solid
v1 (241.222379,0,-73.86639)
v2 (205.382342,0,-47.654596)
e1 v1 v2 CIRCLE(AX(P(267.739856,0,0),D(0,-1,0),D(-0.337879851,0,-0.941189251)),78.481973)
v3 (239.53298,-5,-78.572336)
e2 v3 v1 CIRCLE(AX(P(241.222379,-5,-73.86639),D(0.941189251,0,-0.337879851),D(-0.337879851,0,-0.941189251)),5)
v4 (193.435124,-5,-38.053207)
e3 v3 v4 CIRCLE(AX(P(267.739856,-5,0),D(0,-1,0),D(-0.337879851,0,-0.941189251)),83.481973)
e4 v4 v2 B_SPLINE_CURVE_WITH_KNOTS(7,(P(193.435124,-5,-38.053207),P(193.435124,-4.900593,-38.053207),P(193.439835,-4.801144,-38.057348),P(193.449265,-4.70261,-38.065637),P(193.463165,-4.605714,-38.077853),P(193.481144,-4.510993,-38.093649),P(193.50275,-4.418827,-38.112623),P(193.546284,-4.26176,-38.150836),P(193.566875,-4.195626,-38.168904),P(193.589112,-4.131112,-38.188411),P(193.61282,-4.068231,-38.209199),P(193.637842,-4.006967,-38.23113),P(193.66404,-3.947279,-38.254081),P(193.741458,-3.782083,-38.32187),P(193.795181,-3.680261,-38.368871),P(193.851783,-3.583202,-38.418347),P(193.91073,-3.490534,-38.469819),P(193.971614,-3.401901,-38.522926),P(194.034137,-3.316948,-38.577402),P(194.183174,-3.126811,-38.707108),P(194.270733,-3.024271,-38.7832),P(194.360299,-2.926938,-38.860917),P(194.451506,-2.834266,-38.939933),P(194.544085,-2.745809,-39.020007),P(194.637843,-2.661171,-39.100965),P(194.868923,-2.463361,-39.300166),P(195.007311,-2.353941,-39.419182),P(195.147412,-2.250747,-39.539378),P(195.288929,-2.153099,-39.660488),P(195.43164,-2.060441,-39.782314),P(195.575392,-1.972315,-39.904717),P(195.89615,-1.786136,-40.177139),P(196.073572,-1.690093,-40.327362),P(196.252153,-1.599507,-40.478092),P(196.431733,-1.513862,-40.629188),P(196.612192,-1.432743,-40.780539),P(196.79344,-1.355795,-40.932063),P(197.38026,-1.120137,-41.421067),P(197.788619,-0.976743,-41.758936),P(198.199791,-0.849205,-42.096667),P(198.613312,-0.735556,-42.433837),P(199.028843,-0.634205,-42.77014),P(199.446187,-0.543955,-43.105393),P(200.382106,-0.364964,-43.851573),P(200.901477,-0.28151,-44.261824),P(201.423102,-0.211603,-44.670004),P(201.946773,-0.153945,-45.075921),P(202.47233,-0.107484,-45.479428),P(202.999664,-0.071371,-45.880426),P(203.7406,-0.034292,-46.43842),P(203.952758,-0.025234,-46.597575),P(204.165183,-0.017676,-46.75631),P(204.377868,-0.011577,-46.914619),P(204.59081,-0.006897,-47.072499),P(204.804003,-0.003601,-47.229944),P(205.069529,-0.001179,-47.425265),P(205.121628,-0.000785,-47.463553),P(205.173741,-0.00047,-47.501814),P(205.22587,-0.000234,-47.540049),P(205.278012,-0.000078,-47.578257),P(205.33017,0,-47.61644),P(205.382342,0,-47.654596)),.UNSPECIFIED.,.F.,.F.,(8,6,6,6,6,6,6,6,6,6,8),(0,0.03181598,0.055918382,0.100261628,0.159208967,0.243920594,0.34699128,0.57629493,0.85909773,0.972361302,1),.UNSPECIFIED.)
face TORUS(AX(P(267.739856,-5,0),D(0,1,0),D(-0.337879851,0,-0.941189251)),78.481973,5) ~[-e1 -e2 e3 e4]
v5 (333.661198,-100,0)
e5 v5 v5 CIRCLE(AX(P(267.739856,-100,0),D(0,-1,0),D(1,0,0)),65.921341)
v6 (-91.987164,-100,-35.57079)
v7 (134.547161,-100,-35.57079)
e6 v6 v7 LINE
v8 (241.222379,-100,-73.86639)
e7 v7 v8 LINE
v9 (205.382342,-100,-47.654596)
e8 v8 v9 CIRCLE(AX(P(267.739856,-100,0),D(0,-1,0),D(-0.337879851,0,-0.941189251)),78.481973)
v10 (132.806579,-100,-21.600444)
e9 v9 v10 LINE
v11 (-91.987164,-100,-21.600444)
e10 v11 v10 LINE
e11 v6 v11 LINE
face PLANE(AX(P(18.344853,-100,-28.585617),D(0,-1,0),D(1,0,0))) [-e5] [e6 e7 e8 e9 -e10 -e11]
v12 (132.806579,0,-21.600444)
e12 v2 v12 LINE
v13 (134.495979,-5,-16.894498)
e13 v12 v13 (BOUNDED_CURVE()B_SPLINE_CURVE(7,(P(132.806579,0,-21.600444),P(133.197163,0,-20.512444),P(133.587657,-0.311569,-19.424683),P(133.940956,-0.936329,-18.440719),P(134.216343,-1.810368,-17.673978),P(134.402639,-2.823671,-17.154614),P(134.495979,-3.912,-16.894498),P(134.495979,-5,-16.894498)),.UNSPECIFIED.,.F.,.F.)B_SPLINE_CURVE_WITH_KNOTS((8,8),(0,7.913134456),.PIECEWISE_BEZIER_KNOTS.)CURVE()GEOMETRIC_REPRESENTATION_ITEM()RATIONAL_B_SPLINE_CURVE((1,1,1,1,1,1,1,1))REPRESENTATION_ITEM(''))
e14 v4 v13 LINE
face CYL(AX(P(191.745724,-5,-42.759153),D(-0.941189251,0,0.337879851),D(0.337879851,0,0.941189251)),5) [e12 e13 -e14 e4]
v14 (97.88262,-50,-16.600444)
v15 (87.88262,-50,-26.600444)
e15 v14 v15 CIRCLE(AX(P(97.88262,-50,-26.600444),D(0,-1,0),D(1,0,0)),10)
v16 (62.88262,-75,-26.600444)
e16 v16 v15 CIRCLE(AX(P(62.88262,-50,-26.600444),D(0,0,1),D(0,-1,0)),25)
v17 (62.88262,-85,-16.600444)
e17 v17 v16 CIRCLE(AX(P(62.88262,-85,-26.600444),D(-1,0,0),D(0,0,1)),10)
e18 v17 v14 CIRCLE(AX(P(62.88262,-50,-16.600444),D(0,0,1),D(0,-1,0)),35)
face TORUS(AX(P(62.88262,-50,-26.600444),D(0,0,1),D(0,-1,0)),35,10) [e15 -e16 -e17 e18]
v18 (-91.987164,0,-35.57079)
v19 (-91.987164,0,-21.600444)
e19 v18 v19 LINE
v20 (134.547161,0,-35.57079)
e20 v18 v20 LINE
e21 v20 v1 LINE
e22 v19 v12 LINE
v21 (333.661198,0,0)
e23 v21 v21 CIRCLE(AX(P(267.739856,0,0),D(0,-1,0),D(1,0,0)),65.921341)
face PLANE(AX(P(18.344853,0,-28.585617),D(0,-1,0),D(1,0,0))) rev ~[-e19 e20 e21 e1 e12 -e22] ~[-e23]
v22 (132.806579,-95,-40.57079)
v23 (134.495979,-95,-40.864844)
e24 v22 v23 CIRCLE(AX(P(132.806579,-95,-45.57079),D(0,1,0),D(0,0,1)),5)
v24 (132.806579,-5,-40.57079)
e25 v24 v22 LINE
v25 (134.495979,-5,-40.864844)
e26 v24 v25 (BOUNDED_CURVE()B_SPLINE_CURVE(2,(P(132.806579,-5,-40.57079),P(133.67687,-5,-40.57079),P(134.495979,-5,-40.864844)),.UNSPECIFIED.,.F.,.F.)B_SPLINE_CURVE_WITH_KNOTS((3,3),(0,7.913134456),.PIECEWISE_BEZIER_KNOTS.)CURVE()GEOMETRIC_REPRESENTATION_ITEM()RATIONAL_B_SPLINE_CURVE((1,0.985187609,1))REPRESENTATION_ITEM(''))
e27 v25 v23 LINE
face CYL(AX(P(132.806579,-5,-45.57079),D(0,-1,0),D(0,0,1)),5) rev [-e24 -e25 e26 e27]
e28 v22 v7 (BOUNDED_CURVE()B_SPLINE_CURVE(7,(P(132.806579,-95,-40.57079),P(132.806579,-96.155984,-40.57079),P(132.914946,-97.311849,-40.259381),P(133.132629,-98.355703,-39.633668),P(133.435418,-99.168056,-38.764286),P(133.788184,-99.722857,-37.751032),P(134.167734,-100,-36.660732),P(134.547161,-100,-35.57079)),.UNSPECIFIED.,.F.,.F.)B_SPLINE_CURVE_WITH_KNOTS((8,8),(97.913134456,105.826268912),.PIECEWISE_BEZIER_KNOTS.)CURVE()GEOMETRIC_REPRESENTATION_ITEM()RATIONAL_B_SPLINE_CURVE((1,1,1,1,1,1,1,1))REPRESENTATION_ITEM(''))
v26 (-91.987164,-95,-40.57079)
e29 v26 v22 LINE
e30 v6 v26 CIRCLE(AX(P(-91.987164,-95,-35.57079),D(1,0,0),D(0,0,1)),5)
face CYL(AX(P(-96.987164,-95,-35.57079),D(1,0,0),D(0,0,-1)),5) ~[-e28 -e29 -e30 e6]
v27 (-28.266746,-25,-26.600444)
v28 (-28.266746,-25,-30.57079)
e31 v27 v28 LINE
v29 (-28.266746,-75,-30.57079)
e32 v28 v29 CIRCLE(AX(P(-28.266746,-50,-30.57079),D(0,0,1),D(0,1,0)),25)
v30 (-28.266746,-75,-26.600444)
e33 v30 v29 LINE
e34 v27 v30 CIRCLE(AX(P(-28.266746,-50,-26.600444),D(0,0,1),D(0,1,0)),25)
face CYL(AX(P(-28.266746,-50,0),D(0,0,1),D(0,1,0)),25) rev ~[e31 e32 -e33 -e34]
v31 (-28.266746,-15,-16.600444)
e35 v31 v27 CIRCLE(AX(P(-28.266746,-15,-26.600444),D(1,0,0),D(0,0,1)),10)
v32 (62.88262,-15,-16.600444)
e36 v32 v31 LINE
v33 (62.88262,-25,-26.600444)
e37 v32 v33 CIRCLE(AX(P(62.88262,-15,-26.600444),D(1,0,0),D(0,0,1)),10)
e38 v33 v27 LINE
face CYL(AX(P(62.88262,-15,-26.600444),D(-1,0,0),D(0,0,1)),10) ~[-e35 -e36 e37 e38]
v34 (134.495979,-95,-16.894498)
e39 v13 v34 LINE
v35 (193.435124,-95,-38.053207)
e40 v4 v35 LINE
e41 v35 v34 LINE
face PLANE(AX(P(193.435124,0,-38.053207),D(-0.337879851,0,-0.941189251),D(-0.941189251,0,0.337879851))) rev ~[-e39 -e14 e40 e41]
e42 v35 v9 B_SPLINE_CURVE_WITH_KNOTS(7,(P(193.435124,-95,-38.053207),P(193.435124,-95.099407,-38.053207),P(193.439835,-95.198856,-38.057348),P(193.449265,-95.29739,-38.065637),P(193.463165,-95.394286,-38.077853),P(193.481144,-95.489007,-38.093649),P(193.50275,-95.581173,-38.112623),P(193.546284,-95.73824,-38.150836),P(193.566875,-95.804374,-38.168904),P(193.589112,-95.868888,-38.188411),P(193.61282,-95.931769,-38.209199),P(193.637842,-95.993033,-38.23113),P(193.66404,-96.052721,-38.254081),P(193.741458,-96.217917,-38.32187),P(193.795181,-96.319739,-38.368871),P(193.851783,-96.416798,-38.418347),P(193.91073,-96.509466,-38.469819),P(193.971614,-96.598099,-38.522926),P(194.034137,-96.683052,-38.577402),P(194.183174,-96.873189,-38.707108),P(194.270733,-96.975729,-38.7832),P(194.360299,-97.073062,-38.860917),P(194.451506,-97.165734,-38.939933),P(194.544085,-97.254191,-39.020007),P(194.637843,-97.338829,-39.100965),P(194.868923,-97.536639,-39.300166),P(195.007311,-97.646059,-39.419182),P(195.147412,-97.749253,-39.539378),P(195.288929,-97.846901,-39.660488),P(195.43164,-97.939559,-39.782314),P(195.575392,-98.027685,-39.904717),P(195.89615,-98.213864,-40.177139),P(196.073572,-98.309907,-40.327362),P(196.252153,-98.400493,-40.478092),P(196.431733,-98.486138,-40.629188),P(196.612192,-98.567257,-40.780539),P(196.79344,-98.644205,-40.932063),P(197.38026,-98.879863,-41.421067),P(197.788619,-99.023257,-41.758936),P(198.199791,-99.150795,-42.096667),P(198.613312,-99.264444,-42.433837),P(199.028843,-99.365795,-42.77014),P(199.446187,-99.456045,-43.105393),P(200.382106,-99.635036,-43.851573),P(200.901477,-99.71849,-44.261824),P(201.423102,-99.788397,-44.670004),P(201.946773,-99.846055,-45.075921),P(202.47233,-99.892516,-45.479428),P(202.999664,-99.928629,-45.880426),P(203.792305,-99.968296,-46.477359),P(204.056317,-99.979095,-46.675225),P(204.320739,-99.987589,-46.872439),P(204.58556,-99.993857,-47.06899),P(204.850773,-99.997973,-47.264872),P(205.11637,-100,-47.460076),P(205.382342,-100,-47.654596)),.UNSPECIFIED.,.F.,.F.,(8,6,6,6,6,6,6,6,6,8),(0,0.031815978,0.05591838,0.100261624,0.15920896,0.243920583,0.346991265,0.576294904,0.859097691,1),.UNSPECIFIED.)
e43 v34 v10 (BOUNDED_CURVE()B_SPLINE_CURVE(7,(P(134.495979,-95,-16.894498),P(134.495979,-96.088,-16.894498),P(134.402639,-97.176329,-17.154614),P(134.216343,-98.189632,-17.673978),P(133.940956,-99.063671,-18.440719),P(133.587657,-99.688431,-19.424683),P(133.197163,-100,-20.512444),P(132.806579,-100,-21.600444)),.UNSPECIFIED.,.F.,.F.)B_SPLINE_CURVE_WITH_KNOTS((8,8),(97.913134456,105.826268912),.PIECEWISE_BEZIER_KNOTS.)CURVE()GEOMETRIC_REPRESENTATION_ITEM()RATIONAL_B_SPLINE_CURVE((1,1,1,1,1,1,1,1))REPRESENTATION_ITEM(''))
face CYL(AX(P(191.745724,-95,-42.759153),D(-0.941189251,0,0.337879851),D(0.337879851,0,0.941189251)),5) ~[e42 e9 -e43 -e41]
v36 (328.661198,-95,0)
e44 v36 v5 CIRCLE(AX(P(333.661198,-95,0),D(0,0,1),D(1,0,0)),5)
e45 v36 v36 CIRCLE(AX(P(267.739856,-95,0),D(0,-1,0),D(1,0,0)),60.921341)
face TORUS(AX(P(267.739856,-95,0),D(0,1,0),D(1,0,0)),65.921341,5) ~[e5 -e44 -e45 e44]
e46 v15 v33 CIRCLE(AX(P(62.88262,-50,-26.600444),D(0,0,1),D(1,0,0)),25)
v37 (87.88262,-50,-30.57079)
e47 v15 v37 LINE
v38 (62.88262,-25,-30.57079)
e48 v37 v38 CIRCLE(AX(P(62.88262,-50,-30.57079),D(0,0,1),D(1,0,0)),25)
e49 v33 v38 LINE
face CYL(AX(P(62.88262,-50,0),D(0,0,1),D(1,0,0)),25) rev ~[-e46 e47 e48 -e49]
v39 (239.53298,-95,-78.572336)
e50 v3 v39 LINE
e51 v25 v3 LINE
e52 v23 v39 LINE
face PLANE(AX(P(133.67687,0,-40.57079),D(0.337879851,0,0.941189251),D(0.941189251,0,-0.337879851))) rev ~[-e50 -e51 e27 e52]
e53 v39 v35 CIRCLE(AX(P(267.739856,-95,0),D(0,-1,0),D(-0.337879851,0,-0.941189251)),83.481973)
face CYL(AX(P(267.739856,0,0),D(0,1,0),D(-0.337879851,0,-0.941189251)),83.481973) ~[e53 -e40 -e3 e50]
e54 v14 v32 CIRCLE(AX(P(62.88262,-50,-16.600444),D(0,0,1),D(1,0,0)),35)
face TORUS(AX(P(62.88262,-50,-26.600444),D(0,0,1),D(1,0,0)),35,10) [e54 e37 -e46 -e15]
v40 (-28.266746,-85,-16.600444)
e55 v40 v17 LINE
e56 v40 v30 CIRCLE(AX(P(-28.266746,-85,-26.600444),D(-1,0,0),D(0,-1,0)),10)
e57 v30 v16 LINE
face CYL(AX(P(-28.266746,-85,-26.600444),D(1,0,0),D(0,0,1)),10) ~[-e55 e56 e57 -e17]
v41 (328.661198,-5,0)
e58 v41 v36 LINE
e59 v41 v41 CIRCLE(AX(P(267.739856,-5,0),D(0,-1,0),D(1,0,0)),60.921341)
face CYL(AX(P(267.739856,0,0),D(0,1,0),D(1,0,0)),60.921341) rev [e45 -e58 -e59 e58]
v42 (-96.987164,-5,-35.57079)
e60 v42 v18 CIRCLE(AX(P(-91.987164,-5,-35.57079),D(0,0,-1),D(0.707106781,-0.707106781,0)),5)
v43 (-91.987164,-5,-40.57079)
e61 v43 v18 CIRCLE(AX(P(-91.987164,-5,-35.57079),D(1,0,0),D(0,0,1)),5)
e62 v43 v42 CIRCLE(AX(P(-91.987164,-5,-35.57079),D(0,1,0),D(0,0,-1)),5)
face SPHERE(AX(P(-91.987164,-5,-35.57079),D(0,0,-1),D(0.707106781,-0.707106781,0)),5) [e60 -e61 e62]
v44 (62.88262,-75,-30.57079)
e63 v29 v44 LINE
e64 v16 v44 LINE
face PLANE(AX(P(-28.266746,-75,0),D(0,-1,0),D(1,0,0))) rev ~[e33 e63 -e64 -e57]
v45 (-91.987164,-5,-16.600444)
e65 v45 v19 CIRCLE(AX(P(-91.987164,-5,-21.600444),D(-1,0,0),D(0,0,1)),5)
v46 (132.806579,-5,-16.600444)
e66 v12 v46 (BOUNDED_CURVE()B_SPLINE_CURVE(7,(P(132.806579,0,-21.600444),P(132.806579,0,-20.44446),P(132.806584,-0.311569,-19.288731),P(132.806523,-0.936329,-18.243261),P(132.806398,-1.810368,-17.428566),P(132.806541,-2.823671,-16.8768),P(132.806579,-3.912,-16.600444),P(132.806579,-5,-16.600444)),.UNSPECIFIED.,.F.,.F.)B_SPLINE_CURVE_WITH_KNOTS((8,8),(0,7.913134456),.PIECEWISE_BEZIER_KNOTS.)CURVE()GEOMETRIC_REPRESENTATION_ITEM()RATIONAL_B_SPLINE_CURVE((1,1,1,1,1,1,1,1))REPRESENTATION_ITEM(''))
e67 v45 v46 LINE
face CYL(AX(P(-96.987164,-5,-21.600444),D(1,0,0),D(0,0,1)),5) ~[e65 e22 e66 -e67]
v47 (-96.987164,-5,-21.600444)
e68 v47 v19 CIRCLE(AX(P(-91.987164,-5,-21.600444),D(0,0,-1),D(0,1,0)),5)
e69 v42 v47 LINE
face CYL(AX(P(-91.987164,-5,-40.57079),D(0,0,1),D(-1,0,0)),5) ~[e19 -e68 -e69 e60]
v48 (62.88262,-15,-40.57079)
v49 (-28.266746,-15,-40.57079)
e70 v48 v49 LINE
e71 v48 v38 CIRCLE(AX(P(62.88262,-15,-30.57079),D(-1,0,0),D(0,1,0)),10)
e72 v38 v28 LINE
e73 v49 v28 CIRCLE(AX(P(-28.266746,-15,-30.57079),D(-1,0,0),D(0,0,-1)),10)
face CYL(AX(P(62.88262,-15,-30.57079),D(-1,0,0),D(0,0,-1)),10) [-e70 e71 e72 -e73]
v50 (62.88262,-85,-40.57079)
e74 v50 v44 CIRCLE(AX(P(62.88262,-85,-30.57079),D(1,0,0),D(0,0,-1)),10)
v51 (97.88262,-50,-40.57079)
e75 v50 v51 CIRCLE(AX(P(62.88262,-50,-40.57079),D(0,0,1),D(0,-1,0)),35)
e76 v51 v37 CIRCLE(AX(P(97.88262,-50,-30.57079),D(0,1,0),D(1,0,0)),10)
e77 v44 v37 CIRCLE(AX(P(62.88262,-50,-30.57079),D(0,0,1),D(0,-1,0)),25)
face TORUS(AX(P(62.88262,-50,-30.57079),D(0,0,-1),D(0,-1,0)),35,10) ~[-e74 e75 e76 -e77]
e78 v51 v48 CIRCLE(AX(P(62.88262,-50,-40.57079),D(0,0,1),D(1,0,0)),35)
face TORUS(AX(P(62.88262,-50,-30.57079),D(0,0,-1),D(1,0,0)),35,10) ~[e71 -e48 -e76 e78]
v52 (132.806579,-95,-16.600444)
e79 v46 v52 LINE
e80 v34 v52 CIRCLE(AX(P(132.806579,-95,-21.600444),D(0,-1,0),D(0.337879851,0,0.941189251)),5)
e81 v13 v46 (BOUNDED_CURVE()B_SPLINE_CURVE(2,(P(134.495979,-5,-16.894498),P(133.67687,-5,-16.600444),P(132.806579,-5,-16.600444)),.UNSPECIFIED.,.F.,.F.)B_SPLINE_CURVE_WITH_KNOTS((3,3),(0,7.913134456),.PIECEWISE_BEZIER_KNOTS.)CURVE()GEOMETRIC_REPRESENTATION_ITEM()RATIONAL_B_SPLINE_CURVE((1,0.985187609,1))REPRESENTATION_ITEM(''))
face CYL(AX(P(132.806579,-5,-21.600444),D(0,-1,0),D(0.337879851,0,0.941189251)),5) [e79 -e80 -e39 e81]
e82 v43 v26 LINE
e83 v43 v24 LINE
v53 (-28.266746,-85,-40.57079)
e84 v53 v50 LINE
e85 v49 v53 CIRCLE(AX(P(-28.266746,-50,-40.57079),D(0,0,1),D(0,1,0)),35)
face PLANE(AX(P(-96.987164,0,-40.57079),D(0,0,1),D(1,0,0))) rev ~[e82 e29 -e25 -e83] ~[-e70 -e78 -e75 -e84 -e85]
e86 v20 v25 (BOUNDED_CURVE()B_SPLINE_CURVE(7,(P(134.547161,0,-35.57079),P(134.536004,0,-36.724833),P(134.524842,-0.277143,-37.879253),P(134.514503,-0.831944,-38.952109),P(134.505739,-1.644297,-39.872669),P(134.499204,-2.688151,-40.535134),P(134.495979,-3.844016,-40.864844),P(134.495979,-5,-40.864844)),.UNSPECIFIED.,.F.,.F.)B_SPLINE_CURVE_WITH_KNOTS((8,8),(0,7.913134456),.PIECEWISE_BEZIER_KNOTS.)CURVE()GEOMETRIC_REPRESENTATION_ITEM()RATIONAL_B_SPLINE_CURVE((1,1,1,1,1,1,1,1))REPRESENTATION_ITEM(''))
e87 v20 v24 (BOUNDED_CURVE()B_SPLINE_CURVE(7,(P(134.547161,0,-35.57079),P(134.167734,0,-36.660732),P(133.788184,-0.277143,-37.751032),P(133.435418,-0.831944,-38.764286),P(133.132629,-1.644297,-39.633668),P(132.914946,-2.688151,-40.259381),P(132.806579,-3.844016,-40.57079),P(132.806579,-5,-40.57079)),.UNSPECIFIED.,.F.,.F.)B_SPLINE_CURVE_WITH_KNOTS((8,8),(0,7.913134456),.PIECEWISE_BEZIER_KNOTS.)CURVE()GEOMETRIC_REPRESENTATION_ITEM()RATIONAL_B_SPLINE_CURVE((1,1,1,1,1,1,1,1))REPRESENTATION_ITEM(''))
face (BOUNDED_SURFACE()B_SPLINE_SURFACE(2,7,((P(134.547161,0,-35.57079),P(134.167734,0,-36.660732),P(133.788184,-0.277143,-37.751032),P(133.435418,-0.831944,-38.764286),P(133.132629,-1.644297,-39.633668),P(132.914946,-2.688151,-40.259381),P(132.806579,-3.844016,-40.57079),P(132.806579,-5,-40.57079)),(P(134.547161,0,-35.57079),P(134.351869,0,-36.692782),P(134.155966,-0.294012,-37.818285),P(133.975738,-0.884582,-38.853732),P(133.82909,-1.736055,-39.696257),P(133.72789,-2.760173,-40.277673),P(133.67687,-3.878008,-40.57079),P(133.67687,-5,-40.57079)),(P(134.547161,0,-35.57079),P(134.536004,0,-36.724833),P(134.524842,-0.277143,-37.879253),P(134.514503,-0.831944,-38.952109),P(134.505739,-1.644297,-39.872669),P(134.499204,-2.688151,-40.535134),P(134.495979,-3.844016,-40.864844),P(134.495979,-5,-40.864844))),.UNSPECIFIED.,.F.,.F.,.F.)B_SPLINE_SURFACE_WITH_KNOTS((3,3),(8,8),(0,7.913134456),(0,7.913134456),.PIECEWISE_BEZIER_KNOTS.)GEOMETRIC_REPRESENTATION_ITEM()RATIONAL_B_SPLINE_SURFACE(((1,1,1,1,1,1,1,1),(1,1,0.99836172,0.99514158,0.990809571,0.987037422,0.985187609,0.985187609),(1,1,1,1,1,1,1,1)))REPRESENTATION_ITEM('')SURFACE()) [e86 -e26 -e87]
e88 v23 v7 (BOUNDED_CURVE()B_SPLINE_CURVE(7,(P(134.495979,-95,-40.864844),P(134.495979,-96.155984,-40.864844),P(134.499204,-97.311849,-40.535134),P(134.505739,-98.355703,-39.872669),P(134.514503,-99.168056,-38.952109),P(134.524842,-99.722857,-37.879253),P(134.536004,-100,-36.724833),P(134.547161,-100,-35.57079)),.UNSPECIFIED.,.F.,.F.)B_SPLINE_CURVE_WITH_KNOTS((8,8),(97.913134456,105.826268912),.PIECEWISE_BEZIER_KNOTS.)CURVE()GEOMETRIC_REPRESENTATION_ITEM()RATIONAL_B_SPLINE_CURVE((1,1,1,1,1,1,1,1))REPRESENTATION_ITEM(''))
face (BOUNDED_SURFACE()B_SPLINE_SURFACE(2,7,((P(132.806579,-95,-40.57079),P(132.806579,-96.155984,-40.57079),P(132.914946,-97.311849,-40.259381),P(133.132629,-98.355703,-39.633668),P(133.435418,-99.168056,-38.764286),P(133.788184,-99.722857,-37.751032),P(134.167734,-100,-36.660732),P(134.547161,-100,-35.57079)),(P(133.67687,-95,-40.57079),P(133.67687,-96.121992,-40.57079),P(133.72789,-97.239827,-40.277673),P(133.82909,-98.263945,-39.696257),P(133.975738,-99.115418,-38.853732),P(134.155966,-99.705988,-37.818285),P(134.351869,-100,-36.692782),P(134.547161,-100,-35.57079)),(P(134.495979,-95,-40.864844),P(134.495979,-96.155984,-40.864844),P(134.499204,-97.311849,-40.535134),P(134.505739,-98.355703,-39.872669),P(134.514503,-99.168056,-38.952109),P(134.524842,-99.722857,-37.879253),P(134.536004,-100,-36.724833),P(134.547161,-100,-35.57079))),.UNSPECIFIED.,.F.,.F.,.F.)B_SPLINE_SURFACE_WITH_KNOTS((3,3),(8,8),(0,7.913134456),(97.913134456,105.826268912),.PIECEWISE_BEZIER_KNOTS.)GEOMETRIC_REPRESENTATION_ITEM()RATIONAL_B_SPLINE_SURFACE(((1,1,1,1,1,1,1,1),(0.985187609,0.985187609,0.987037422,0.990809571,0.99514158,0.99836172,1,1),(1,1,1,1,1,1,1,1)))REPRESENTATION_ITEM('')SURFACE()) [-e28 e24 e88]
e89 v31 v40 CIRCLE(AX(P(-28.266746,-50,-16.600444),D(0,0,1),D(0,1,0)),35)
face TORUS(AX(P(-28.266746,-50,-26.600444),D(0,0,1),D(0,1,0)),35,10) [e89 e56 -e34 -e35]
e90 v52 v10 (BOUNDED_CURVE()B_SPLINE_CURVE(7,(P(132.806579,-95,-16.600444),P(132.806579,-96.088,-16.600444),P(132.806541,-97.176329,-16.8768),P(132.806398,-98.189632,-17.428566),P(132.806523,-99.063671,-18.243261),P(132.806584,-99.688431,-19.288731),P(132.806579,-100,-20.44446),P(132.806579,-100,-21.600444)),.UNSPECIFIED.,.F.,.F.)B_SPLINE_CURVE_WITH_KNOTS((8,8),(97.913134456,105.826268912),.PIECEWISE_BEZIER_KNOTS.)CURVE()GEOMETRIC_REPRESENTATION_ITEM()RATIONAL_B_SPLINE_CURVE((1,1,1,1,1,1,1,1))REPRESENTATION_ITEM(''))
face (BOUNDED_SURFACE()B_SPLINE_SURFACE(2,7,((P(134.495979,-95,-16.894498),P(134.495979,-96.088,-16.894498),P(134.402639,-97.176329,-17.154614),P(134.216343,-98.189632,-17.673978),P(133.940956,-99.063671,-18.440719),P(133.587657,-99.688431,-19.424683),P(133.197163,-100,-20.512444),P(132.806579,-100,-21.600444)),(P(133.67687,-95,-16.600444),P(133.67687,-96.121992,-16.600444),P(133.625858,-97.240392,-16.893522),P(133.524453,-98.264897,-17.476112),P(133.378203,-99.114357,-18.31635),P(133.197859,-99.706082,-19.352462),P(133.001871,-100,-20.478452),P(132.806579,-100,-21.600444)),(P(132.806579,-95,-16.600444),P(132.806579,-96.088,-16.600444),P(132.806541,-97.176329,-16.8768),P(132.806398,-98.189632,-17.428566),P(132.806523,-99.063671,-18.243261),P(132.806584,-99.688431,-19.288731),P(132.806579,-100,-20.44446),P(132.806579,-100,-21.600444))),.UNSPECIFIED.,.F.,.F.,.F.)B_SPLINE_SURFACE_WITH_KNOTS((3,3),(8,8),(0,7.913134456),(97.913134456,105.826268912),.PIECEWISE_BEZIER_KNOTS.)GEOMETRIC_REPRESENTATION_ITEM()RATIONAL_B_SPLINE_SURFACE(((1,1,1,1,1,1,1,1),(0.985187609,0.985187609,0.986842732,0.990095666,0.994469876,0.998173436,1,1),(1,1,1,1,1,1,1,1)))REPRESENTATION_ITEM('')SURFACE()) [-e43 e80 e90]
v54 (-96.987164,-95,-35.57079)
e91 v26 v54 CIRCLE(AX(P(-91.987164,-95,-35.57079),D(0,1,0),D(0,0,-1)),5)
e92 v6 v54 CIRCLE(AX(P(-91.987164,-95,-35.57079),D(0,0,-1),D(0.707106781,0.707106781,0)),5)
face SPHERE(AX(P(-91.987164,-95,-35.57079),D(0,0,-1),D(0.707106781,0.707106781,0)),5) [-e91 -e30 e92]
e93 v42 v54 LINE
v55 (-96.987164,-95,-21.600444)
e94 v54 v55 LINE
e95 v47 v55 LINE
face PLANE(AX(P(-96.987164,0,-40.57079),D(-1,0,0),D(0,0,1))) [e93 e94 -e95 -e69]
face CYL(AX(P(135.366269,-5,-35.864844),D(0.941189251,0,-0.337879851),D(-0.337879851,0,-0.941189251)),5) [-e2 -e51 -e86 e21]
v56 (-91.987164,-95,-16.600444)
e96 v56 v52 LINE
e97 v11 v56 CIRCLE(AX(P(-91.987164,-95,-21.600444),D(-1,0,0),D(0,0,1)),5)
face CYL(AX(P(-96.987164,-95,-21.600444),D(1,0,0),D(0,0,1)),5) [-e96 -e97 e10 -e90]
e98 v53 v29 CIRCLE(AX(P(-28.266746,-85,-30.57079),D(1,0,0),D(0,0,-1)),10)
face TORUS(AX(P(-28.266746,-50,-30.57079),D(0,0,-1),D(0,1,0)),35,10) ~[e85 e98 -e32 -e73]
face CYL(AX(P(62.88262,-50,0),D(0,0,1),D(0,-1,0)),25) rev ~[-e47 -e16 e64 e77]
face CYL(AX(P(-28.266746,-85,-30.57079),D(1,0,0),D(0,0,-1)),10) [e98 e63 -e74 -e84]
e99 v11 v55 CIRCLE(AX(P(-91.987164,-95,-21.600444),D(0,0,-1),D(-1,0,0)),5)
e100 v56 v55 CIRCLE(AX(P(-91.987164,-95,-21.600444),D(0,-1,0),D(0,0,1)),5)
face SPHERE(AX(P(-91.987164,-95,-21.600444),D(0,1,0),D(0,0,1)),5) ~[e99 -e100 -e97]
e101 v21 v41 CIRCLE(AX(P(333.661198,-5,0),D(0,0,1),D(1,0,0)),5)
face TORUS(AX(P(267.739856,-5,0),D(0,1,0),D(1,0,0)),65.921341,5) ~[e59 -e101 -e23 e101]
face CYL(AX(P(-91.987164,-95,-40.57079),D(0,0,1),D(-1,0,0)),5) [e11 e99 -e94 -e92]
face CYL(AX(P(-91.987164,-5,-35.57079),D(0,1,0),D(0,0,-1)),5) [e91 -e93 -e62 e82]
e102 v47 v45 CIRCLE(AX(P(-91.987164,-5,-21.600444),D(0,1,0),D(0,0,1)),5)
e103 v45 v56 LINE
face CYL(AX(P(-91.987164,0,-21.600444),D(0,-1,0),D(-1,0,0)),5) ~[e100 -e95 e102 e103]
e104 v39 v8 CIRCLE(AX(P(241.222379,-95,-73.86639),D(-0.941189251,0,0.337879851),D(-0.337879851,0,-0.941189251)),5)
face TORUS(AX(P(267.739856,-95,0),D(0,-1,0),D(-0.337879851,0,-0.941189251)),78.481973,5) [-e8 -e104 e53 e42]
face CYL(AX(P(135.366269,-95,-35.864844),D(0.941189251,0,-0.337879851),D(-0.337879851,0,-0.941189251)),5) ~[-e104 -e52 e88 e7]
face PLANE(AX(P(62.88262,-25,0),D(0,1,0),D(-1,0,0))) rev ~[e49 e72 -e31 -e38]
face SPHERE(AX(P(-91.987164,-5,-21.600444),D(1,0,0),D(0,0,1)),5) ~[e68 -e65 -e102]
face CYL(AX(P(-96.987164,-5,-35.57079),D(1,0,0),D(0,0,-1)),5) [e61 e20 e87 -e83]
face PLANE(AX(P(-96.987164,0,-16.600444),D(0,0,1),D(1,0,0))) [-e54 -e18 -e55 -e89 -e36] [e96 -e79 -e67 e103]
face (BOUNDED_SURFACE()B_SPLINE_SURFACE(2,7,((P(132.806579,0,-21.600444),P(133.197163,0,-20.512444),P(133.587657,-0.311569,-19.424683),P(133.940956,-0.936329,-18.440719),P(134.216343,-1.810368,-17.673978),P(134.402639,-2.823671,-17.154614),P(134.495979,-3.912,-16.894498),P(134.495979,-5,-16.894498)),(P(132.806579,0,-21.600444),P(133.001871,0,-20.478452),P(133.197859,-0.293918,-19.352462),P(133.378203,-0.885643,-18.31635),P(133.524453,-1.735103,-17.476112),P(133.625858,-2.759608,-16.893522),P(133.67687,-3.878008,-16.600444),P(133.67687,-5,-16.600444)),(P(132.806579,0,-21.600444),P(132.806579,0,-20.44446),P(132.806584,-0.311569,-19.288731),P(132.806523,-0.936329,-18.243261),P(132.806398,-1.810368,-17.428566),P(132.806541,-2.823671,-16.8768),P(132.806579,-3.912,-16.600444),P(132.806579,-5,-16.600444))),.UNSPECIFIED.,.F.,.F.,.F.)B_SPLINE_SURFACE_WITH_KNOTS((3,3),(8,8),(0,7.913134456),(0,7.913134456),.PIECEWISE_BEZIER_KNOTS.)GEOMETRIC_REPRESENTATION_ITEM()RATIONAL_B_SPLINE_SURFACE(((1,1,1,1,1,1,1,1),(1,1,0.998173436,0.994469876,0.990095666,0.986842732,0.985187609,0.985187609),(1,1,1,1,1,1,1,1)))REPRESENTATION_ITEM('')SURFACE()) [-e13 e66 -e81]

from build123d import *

# Parameters (mm, degrees)
F0_W         = 230.6640344313
F0_H         = 23.9703460229
F0_R         = 60.9213413602
F1_DEPTH     = 100
F2_R         = 5
F3_R         = 5
F5_DEPTH     = 126.802245155
F6_R         = 10
F7_T1_DEPTH  = 90
F7_S5_W      = 5
F7_S5_H      = 5
F7_T6_DEPTH  = 5
F7_S11_W     = 5
F7_S11_H     = 5
F7_T12_DEPTH = 5
F8_R         = 5


# Not quite as in the source:
# - a fillet or chamfer that OpenCascade refuses, or shapes differently, is made with other operations: its cross-section is extruded or revolved along the edge and cut away or added


with BuildPart() as f1:
    # F0 (on Front) → F1 (new body)
    with BuildSketch(Plane.XZ):
        with Locations((18.3448529433, -28.5856171006)):
            Rectangle(F0_W, F0_H)
        with BuildLine():
            Line((193.4351235014, -38.0532068809), (133.676870159, -16.6004440891))
            Line((133.676870159, -16.6004440891), (133.676870159, -40.570790112))
            Line((133.676870159, -40.570790112), (239.5329796232, -78.572335997))
            ThreePointArc((239.5329796232, -78.572335997), (322.8543506597, 62.7027303843), (193.4351235014, -38.0532068809))
        make_face()
        with Locations((267.7398563617, 0)):
            Circle(F0_R, mode=Mode.SUBTRACT)
    extrude(amount=F1_DEPTH)

    # F2
    f2_edges = [f1.edges().sort_by_distance(p)[0] for p in [
        (186.604925, 0, -59.571563),
        (18.344853, 0, -40.57079),
        (18.344853, 0, -16.600444),
        (163.555997, 0, -27.326825),
        (-96.987164, -50, -16.600444),
        (-96.987164, 0, -28.585617),
        (206.818515, -100, 0),
        (322.854351, -100, 62.70273),
        (18.344853, -100, -16.600444),
        (-96.987164, -100, -28.585617),
        (18.344853, -100, -40.57079),
        (186.604925, -100, -59.571563),
        (163.555997, -100, -27.326825),
    ]]
    fillet(f2_edges, radius=F2_R)

    # F3
    f3_edges = [f1.edges().sort_by_distance(p)[0] for p in [
        (206.818515, 0, 0),
    ]]
    fillet(f3_edges, radius=F3_R)

    # F4 (on Top) → F5 (cut)
    with BuildSketch(Plane.XY):
        with BuildLine():
            ThreePointArc((-28.2667462326, -75), (-10.5890767029, -67.6776695297), (-3.2667462326, -50))
            ThreePointArc((-3.2667462326, -50), (-10.5890767029, -32.3223304703), (-28.2667462326, -25))
            ThreePointArc((-28.2667462326, -25), (-53.2667462326, -50), (-28.2667462326, -75))
        make_face()
        with BuildLine():
            ThreePointArc((-28.2667462326, -25), (-10.5890767029, -32.3223304703), (-3.2667462326, -50))
            ThreePointArc((-3.2667462326, -50), (-10.5890767029, -67.6776695297), (-28.2667462326, -75))
            Line((-28.2667462326, -75), (62.8826200036, -75))
            ThreePointArc((62.8826200036, -75), (37.8826200036, -50), (62.8826200036, -25))
            Line((62.8826200036, -25), (-28.2667462326, -25))
        make_face()
        with BuildLine():
            ThreePointArc((87.8826200036, -50), (80.5602895333, -32.3223304703), (62.8826200036, -25))
            ThreePointArc((62.8826200036, -25), (37.8826200036, -50), (62.8826200036, -75))
            ThreePointArc((62.8826200036, -75), (80.5602895333, -67.6776695297), (87.8826200036, -50))
        make_face()
    extrude(amount=-F5_DEPTH, mode=Mode.SUBTRACT)

    # F6
    f6_edges = [f1.edges().sort_by_distance(p)[0] for p in [
        (17.307937, -75, -40.57079),
        (17.307937, -25, -16.600444),
    ]]
    fillet(f6_edges, radius=F6_R)

    # F7: fillet of radius 5 on 1 edges, made by hand

    # F7_s2 → F7_t1 (cut)
    with BuildSketch(Plane.XZ.offset(5)):
        with BuildLine():
            ThreePointArc((-91.9871642723, -40.570790112), (-95.5226981783, -39.106324018), (-96.9871642723, -35.570790112))
            Line((-96.9871642723, -35.570790112), (-96.9871642723, -40.570790112))
            Line((-96.9871642723, -40.570790112), (-91.9871642723, -40.570790112))
        make_face()
    extrude(amount=F7_T1_DEPTH, mode=Mode.SUBTRACT)


with BuildPart() as f7_tool4:
    # F7_s5 → F7_t6 (new body)
    with BuildSketch(Plane.XY.offset(-35.570790112)):
        with Locations((-94.4871642723, -2.5)):
            Rectangle(F7_S5_W, F7_S5_H)
    extrude(amount=-F7_T6_DEPTH)

    # F7_s7 → F7_t8 (revolve, cut)
    with BuildSketch(Plane(origin=(-91.9871642723, -5, -35.570790112), x_dir=(0.7071067812, -0.7071067812, 0), z_dir=(0.7071067812, 0.7071067812, 0))):
        with BuildLine():
            ThreePointArc((0, -5), (5, 0), (0, 5))
            Line((0, 5), (0, -5))
        make_face()
    revolve(axis=Axis((-91.9871642723, -5, -35.570790112), (0, 0, -1)), mode=Mode.SUBTRACT)


with BuildPart() as f1_1:
    add(f1.part)

    # F7_t3: cut F7_tool4
    add(f7_tool4.part, mode=Mode.SUBTRACT)


with BuildPart() as f7_tool10:
    # F7_s11 → F7_t12 (new body)
    with BuildSketch(Plane.XY.offset(-35.570790112)):
        with Locations((-94.4871642723, -97.5)):
            Rectangle(F7_S11_W, F7_S11_H)
    extrude(amount=-F7_T12_DEPTH)

    # F7_s13 → F7_t14 (revolve, cut)
    with BuildSketch(Plane(origin=(-91.9871642723, -95, -35.570790112), x_dir=(0.7071067812, 0.7071067812, 0), z_dir=(-0.7071067812, 0.7071067812, 0))):
        with BuildLine():
            ThreePointArc((0, -5), (5, 0), (0, 5))
            Line((0, 5), (0, -5))
        make_face()
    revolve(axis=Axis((-91.9871642723, -95, -35.570790112), (0, 0, -1)), mode=Mode.SUBTRACT)


with BuildPart() as f1_2:
    add(f1_1.part)

    # F7_t9: cut F7_tool10
    add(f7_tool10.part, mode=Mode.SUBTRACT)

    # F8
    f8_edges = [f1_2.edges().sort_by_distance(p)[0] for p in [
        (133.67687, -50, -40.57079),
        (133.67687, -50, -16.600444),
    ]]
    fillet(f8_edges, radius=F8_R)


solid = f1_2.part
